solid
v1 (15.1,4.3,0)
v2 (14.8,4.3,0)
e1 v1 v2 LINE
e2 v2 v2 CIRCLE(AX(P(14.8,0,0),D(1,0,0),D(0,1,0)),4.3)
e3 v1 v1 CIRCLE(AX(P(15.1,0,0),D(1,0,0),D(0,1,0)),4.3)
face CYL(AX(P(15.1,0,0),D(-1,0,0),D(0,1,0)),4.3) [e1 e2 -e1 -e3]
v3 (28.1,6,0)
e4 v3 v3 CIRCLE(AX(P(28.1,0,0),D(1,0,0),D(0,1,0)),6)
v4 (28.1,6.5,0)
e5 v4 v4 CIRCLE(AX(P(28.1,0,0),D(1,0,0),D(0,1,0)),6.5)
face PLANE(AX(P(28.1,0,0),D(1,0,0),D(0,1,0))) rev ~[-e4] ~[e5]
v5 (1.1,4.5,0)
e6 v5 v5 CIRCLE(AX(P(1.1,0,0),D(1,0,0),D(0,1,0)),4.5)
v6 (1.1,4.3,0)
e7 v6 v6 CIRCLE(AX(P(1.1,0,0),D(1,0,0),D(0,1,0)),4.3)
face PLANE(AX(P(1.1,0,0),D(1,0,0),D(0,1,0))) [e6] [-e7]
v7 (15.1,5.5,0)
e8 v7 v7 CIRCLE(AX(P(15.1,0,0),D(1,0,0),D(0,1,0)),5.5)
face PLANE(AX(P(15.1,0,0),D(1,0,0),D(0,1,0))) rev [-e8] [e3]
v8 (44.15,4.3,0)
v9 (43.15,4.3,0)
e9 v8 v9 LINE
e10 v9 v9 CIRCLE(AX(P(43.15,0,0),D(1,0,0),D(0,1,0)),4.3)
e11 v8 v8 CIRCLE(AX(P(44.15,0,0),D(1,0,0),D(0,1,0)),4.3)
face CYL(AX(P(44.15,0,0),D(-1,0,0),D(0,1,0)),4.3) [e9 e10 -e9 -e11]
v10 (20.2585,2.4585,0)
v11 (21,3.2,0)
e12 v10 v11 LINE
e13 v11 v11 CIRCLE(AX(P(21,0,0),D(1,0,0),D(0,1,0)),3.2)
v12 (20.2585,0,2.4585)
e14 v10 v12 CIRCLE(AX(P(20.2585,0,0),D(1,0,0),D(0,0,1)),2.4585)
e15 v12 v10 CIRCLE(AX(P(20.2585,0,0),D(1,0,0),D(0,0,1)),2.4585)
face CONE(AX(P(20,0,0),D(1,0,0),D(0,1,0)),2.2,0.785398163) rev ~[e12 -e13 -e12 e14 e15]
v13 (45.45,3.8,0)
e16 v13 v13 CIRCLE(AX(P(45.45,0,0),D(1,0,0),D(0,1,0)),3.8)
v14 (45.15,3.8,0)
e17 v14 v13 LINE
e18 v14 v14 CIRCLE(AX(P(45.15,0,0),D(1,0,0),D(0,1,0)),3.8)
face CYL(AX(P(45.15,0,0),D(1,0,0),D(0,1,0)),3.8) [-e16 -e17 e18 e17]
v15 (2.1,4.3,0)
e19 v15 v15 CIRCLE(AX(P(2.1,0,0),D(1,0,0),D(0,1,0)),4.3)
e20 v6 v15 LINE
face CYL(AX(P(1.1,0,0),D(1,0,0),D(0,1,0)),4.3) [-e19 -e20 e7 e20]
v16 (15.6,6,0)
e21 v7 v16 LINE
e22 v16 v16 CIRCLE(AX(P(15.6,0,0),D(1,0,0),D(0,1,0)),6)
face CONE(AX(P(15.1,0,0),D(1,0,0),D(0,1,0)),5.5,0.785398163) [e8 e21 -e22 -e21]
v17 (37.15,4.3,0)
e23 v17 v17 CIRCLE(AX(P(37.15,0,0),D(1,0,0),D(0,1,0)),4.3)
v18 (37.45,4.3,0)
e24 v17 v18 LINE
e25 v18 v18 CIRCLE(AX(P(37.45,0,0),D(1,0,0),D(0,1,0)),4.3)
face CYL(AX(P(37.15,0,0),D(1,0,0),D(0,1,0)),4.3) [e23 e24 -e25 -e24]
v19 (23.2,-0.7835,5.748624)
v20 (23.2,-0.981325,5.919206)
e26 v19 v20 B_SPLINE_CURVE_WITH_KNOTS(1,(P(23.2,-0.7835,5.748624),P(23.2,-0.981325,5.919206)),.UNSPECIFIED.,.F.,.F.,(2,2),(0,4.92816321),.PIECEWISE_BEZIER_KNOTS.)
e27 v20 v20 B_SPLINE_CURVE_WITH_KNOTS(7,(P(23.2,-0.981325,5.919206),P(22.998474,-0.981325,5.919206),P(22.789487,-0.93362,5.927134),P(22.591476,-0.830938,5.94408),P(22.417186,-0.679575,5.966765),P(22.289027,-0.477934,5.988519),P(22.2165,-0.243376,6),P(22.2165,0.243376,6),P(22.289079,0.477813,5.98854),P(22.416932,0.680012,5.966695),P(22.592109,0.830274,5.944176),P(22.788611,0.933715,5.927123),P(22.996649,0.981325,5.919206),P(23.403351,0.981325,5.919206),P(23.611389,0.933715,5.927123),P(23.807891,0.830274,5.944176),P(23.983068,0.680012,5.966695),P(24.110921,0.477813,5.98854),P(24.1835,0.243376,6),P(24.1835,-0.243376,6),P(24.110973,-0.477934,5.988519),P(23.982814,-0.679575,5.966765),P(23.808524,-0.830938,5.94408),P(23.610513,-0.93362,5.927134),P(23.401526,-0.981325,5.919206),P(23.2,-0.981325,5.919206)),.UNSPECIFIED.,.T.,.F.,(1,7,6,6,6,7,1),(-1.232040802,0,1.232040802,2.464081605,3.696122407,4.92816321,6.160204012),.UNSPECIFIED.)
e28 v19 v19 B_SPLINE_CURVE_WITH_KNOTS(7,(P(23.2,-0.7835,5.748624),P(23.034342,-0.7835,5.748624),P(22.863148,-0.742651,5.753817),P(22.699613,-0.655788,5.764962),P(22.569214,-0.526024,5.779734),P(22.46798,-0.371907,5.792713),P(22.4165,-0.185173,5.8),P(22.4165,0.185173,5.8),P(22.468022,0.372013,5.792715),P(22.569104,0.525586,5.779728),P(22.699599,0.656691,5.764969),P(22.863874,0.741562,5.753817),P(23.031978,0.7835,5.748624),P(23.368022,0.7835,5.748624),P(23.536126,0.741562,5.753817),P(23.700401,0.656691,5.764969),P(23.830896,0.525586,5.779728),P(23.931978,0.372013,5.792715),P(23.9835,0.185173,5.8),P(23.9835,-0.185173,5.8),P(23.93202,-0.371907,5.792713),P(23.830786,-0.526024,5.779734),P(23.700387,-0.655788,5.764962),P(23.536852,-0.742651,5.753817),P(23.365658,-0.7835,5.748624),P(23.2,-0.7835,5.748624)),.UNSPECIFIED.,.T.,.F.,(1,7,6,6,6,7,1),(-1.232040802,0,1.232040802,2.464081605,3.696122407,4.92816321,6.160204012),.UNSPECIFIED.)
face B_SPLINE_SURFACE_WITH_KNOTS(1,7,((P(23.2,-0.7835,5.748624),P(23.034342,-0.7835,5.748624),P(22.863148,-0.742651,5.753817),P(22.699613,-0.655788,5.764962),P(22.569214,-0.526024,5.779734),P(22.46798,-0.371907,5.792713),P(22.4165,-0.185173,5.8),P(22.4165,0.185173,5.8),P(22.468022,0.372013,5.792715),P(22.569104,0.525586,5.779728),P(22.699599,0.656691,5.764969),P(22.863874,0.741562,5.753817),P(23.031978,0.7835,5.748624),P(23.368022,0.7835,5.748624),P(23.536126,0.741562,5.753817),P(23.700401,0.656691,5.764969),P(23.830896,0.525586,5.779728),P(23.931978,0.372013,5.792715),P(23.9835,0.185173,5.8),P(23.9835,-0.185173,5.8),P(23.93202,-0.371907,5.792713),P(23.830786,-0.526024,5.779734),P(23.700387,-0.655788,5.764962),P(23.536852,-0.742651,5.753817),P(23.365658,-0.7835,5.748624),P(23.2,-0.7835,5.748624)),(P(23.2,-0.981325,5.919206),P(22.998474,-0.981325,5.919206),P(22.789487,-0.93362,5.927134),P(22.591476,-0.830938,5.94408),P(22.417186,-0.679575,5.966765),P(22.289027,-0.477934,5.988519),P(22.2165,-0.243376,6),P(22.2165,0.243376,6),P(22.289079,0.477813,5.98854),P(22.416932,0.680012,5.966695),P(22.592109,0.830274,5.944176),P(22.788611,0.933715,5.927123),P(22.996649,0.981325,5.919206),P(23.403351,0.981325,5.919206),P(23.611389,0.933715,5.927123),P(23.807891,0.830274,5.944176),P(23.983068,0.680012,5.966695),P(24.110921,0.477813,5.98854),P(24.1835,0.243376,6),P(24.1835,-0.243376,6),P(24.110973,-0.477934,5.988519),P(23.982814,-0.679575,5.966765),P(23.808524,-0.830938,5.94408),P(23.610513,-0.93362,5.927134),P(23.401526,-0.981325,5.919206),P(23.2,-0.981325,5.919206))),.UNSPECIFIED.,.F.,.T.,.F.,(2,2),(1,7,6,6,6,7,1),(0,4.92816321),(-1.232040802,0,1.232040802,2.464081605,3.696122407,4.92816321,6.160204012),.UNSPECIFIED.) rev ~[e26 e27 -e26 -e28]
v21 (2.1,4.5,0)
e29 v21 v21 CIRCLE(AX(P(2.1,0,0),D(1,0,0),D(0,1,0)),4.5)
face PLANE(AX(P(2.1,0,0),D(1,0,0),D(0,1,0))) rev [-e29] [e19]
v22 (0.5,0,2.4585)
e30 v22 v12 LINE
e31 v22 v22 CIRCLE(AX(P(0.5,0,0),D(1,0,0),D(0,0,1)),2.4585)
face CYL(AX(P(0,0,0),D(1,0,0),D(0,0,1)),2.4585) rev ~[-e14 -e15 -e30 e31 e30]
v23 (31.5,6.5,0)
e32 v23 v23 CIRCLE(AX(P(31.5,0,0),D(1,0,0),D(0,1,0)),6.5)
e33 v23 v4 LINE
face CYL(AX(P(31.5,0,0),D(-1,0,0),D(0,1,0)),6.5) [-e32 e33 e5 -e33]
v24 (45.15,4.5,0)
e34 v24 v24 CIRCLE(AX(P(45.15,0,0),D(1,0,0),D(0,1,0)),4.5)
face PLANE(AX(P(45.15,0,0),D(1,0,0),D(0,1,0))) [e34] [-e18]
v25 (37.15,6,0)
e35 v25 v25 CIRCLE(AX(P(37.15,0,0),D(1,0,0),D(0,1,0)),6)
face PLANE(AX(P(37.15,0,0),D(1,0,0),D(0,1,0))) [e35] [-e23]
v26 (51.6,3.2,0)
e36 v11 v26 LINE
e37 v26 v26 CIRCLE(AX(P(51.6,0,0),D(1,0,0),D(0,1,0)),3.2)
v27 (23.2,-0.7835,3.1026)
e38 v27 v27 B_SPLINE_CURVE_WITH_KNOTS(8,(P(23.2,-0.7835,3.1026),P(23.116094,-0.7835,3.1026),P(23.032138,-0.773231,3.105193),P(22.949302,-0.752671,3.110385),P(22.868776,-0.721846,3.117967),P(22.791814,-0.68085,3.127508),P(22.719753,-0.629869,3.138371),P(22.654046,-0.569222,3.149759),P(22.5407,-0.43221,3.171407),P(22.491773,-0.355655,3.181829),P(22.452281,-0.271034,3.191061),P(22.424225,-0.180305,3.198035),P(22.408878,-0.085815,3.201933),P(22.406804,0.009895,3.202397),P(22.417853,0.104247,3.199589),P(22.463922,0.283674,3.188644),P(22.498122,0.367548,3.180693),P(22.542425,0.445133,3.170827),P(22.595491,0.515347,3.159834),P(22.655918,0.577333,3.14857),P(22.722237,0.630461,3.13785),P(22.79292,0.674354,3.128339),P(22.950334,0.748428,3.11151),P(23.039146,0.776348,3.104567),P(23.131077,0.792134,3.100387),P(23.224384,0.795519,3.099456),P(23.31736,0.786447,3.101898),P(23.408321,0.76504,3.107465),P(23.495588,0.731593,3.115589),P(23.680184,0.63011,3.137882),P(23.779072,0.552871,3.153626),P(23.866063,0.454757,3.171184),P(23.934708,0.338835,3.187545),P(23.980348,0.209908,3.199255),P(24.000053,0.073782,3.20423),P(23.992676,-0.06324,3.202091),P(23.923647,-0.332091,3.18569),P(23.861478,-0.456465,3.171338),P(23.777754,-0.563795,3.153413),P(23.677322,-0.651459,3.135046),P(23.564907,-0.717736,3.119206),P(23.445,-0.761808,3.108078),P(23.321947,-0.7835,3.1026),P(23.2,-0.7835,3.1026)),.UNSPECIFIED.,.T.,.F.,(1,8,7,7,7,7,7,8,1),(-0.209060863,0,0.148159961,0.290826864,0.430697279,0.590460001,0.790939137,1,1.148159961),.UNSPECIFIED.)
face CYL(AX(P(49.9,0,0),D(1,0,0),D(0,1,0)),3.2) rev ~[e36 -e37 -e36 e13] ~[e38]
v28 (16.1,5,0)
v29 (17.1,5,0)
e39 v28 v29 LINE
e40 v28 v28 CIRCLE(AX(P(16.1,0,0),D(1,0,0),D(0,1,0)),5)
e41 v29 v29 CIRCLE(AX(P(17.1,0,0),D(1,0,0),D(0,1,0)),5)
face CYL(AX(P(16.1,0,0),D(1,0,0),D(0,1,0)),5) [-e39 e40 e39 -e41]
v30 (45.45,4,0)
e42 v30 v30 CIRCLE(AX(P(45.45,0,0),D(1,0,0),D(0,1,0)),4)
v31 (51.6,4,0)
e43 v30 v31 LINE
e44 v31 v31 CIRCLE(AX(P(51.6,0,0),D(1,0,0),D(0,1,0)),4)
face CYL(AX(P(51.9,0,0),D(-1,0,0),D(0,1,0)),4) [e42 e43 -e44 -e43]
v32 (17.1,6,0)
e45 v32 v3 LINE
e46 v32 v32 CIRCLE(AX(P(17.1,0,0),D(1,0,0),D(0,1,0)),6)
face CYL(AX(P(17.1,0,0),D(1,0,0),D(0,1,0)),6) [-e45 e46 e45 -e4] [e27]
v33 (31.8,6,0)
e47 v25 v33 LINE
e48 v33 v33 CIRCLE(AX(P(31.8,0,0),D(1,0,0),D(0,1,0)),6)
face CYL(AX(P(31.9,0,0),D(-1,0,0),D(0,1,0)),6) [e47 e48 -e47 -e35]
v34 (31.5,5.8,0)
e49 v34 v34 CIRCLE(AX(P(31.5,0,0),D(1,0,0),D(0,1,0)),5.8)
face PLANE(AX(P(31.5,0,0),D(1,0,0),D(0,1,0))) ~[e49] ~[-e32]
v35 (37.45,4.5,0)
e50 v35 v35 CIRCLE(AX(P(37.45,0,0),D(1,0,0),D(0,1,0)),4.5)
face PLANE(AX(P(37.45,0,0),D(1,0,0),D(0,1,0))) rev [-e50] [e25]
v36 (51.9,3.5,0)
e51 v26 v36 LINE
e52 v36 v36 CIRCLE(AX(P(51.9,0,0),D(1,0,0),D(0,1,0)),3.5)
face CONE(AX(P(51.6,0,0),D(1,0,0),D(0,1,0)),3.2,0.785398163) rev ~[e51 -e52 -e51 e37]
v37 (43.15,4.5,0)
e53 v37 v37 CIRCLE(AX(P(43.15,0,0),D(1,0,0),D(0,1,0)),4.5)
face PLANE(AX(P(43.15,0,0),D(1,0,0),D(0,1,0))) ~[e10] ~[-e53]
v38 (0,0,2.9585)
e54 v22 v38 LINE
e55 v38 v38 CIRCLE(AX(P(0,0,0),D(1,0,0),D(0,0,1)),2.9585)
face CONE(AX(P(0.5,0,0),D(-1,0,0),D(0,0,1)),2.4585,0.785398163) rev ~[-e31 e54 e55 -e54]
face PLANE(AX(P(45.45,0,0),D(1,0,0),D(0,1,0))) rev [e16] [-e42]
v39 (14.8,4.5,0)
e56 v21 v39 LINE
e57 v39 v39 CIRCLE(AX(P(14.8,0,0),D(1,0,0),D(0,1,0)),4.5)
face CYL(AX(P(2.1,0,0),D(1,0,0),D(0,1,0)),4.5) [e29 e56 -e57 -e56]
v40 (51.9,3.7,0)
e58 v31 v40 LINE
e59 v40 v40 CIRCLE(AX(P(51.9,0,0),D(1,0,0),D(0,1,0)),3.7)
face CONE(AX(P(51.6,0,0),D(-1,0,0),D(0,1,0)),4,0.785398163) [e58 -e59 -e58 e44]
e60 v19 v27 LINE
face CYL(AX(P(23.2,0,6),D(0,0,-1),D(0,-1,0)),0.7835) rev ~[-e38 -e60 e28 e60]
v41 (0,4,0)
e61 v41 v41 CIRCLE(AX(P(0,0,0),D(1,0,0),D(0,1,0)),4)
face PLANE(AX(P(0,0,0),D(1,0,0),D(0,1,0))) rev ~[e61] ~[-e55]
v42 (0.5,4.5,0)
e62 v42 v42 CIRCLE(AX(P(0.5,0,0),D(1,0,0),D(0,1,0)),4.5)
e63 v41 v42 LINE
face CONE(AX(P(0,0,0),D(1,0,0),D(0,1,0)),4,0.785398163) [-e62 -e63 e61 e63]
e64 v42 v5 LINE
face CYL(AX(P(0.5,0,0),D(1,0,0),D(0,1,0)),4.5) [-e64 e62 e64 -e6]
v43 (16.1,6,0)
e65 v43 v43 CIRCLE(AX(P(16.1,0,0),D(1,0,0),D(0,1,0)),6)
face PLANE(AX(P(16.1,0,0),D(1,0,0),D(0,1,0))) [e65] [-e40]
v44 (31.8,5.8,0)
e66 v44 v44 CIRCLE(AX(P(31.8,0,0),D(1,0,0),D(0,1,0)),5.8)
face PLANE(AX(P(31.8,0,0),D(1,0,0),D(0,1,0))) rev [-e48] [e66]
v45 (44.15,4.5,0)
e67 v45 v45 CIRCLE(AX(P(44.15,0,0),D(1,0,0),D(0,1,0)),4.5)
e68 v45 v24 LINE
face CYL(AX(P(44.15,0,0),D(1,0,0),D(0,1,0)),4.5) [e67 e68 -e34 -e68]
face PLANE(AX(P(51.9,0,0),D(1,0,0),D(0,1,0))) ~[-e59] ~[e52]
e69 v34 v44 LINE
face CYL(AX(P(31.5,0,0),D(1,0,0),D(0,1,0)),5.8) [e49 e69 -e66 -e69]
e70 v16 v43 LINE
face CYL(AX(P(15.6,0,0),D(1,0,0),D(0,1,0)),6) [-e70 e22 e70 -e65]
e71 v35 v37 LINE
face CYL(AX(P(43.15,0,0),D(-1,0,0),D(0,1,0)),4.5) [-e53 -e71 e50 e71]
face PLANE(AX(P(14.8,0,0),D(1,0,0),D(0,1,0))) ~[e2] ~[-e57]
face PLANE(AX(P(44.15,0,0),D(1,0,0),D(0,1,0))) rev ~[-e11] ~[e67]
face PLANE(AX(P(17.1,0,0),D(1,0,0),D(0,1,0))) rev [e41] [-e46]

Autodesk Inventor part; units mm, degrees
ref_plane "YZ Plane" through (0, 0, 0) normal (1, 0, 0) x (0, 1, 0)
ref_plane "XZ Plane" through (0, 0, 0) normal (0, 1, 0) x (-1, 0, 0)
ref_plane "XY Plane" through (0, 0, 0) normal (0, 0, 1) x (1, 0, 0)
sketch "Sketch2" plane through (0, 0, 0) normal (0, 0, 1) x (1, 0, 0)
  line L0 (0, 4) -> (0.5, 4.5)
  line L1 (0, 4) -> (0, 3)
  line L2 (0.5, 4.5) -> (1.1, 4.5)
  line L3 (1.1, 4.5) -> (1.1, 4.3)
  line L4 (1.1, 4.3) -> (2.1, 4.3)
  line L5 (2.1, 4.3) -> (2.1, 4.5)
  line L6 (2.1, 4.5) -> (14.8, 4.5)
  line L7 (15.1, 4.5) -> (15.1, 5.5)
  line L8 (15.1, 5.5) -> (15.6, 6)
  line L9 (44.15, 4.5) -> (44.15, 4.3)
  line L10 (44.15, 4.3) -> (43.15, 4.3)
  line L11 (43.15, 4.3) -> (43.15, 4.5)
  line L12 (0, 0) -> (27.0854, 0) construction
  line L13 (15.6, 6) -> (16.1, 6)
  line L14 (16.1, 6) -> (16.1, 5)
  line L15 (16.1, 5) -> (17.1, 5)
  line L16 (17.1, 5) -> (17.1, 6)
  line L17 (31.9, 6) -> (31.8, 6)
  line L18 (31.5, 6) -> (31.5, 6.5)
  line L19 (31.5, 6.5) -> (28.1, 6.5)
  line L20 (28.1, 6.5) -> (28.1, 6)
  line L21 (17.1, 6) -> (28.1, 6)
  line L22 (21, 3.2) -> (43.9, 3.2)
  line L23 (44.15, 4.5) -> (45.15, 4.5)
  line L24 (43.15, 4.5) -> (37.9, 4.5)
  line L25 (37.15, 6) -> (31.9, 6)
  line L26 (43.9, 3.2) -> (49.9, 3.2)
  line L27 (49.9, 4) -> (45.45, 4)
  line L28 (45.15, 4) -> (45.15, 4.5)
  line L29 (49.9, 3.2) -> (51.9, 3.2)
  line L30 (51.9, 3.2) -> (51.9, 4)
  line L31 (51.9, 4) -> (49.9, 4)
  line L32 (37.9, 4.5) -> (37.45, 4.5)
  line L33 (37.15, 4.5) -> (37.15, 6)
  line L34 (15.1, 4.5) -> (15.1, 4.3)
  line L35 (15.1, 4.3) -> (14.8, 4.3)
  line L36 (14.8, 4.3) -> (14.8, 4.5)
  line L37 (31.5, 6) -> (31.5, 5.8)
  line L38 (31.5, 5.8) -> (31.8, 5.8)
  line L39 (31.8, 5.8) -> (31.8, 6)
  line L40 (37.15, 4.5) -> (37.15, 4.3)
  line L41 (37.15, 4.3) -> (37.45, 4.3)
  line L42 (37.45, 4.3) -> (37.45, 4.5)
  line L43 (45.15, 4) -> (45.15, 3.8)
  line L44 (45.15, 3.8) -> (45.45, 3.8)
  line L45 (45.45, 3.8) -> (45.45, 4)
  line L46 (0, 3) -> (0, 0)
  line L47 (0, 0) -> (20, 0)
  line L48 (20, 2.2) -> (20, 0)
  line L49 (20, 2.2) -> (21, 3.2)
  point P0 (1.1, 4.4)
  point P1 (15.85, 6)
  point P2 (16.6, 5)
  dimension "d3" = 4
  dimension "d8" = 1
  dimension "d9" = 0.5
  dimension "d10" = 0.5
  dimension "d11" = 0.2
  dimension "d12" = 1
  dimension "d13" = 13
  dimension "d14" = 1
  dimension "d29" = 0.5
  dimension "d30" = 0.5
  dimension "d36" = 1.1
  dimension "d37" = 4.5
  dimension "d38" = 3
  dimension "d39" = 0.5
  dimension "d40" = 1
  dimension "d41" = 1
  dimension "d60" = 0.4
  dimension "d61" = 0.5
  dimension "d62" = 3.4
  dimension "d63" = 11
  dimension "d65" = 1
  dimension "d66" = 5.25
  dimension "d83" = 6
  dimension "d84" = 0.8
  dimension "d85" = 2
  dimension "d86" = 0.75
  dimension "d105" = 0.2
  dimension "d106" = 0.3
  dimension "d107" = 0.2
  dimension "d108" = 0.3
  dimension "d109" = 0.2
  dimension "d110" = 0.3
  dimension "d111" = 0.2
  dimension "d112" = 0.3
revolve "Revolution1" add sketch "Sketch2" angle 360 about axis through (0, 0, 0) along (1, 0, 0)
thread "Thread1" size "M6x1" class "6H" standard "ISO Metric profile" full length
ref_plane "Work Plane1" through (51.1424, -20, -139.2633) normal (0, 1, 0) x (-1, 0, 0)
sketch "Sketch4" plane through (17.1, 0, 0) normal (-1, 0, 0) x (0, 0, 1)
  circle A0 centre (0, 0) radius 6 projected
  point P0 (0, 6)
  point P1 (6, 0)
  point P2 (0, -6.0107)
  point P3 (-6.0435, 0)
chamfer "Chamfer3" distance 0.3 angle 45 1 edges at (51.9, -4, 0)
ref_plane "Work Plane4" through (17.1, 0, 6) normal (0, 0, 1) x (1, 0, 0)
sketch "Sketch8" plane through (17.1, 0, 6) normal (0, 0, 1) x (1, 0, 0)
  circle A0 centre (6.1, 0) radius 1
  line L0 (0, -6) -> (0, 6) projected
  point P0 (-17.1, 0)
  dimension "d90" = 2
  dimension "d91" = 6.1
hole "Hole3" at (23.2, 0, 6) direction (0, 0, -1) diameter 1.567 depth 6.3 tip angle 118 thread size "M2x0.4" class "6H" standard "ISO Metric profile"
chamfer "Chamfer4" distance 0.2 angle 45 3 edges at (22.6668, -0.5741, 5.9725) (23.7332, -0.5741, 5.9725) (23.2, 0.7835, 5.9486)
chamfer "Chamfer5" distance 0.3 angle 45 1 edges at (51.9, -3.2, 0)
sketch "Sketch9" plane through (0, 0, 0) normal (-1, 0, 0) x (0, 0, 1)
  circle A0 centre (0, 0) radius 1.2953
hole "Hole4" at (0, 0, 0) direction (1, 0, 0) diameter 4.917 end through all thread size "M6x1" class "6H" standard "ISO Metric profile"
chamfer "Chamfer6" distance 0.5 angle 45 1 edges at (0, 0, -2.4585)
properties part number "nakrętka otwor w pionie"
